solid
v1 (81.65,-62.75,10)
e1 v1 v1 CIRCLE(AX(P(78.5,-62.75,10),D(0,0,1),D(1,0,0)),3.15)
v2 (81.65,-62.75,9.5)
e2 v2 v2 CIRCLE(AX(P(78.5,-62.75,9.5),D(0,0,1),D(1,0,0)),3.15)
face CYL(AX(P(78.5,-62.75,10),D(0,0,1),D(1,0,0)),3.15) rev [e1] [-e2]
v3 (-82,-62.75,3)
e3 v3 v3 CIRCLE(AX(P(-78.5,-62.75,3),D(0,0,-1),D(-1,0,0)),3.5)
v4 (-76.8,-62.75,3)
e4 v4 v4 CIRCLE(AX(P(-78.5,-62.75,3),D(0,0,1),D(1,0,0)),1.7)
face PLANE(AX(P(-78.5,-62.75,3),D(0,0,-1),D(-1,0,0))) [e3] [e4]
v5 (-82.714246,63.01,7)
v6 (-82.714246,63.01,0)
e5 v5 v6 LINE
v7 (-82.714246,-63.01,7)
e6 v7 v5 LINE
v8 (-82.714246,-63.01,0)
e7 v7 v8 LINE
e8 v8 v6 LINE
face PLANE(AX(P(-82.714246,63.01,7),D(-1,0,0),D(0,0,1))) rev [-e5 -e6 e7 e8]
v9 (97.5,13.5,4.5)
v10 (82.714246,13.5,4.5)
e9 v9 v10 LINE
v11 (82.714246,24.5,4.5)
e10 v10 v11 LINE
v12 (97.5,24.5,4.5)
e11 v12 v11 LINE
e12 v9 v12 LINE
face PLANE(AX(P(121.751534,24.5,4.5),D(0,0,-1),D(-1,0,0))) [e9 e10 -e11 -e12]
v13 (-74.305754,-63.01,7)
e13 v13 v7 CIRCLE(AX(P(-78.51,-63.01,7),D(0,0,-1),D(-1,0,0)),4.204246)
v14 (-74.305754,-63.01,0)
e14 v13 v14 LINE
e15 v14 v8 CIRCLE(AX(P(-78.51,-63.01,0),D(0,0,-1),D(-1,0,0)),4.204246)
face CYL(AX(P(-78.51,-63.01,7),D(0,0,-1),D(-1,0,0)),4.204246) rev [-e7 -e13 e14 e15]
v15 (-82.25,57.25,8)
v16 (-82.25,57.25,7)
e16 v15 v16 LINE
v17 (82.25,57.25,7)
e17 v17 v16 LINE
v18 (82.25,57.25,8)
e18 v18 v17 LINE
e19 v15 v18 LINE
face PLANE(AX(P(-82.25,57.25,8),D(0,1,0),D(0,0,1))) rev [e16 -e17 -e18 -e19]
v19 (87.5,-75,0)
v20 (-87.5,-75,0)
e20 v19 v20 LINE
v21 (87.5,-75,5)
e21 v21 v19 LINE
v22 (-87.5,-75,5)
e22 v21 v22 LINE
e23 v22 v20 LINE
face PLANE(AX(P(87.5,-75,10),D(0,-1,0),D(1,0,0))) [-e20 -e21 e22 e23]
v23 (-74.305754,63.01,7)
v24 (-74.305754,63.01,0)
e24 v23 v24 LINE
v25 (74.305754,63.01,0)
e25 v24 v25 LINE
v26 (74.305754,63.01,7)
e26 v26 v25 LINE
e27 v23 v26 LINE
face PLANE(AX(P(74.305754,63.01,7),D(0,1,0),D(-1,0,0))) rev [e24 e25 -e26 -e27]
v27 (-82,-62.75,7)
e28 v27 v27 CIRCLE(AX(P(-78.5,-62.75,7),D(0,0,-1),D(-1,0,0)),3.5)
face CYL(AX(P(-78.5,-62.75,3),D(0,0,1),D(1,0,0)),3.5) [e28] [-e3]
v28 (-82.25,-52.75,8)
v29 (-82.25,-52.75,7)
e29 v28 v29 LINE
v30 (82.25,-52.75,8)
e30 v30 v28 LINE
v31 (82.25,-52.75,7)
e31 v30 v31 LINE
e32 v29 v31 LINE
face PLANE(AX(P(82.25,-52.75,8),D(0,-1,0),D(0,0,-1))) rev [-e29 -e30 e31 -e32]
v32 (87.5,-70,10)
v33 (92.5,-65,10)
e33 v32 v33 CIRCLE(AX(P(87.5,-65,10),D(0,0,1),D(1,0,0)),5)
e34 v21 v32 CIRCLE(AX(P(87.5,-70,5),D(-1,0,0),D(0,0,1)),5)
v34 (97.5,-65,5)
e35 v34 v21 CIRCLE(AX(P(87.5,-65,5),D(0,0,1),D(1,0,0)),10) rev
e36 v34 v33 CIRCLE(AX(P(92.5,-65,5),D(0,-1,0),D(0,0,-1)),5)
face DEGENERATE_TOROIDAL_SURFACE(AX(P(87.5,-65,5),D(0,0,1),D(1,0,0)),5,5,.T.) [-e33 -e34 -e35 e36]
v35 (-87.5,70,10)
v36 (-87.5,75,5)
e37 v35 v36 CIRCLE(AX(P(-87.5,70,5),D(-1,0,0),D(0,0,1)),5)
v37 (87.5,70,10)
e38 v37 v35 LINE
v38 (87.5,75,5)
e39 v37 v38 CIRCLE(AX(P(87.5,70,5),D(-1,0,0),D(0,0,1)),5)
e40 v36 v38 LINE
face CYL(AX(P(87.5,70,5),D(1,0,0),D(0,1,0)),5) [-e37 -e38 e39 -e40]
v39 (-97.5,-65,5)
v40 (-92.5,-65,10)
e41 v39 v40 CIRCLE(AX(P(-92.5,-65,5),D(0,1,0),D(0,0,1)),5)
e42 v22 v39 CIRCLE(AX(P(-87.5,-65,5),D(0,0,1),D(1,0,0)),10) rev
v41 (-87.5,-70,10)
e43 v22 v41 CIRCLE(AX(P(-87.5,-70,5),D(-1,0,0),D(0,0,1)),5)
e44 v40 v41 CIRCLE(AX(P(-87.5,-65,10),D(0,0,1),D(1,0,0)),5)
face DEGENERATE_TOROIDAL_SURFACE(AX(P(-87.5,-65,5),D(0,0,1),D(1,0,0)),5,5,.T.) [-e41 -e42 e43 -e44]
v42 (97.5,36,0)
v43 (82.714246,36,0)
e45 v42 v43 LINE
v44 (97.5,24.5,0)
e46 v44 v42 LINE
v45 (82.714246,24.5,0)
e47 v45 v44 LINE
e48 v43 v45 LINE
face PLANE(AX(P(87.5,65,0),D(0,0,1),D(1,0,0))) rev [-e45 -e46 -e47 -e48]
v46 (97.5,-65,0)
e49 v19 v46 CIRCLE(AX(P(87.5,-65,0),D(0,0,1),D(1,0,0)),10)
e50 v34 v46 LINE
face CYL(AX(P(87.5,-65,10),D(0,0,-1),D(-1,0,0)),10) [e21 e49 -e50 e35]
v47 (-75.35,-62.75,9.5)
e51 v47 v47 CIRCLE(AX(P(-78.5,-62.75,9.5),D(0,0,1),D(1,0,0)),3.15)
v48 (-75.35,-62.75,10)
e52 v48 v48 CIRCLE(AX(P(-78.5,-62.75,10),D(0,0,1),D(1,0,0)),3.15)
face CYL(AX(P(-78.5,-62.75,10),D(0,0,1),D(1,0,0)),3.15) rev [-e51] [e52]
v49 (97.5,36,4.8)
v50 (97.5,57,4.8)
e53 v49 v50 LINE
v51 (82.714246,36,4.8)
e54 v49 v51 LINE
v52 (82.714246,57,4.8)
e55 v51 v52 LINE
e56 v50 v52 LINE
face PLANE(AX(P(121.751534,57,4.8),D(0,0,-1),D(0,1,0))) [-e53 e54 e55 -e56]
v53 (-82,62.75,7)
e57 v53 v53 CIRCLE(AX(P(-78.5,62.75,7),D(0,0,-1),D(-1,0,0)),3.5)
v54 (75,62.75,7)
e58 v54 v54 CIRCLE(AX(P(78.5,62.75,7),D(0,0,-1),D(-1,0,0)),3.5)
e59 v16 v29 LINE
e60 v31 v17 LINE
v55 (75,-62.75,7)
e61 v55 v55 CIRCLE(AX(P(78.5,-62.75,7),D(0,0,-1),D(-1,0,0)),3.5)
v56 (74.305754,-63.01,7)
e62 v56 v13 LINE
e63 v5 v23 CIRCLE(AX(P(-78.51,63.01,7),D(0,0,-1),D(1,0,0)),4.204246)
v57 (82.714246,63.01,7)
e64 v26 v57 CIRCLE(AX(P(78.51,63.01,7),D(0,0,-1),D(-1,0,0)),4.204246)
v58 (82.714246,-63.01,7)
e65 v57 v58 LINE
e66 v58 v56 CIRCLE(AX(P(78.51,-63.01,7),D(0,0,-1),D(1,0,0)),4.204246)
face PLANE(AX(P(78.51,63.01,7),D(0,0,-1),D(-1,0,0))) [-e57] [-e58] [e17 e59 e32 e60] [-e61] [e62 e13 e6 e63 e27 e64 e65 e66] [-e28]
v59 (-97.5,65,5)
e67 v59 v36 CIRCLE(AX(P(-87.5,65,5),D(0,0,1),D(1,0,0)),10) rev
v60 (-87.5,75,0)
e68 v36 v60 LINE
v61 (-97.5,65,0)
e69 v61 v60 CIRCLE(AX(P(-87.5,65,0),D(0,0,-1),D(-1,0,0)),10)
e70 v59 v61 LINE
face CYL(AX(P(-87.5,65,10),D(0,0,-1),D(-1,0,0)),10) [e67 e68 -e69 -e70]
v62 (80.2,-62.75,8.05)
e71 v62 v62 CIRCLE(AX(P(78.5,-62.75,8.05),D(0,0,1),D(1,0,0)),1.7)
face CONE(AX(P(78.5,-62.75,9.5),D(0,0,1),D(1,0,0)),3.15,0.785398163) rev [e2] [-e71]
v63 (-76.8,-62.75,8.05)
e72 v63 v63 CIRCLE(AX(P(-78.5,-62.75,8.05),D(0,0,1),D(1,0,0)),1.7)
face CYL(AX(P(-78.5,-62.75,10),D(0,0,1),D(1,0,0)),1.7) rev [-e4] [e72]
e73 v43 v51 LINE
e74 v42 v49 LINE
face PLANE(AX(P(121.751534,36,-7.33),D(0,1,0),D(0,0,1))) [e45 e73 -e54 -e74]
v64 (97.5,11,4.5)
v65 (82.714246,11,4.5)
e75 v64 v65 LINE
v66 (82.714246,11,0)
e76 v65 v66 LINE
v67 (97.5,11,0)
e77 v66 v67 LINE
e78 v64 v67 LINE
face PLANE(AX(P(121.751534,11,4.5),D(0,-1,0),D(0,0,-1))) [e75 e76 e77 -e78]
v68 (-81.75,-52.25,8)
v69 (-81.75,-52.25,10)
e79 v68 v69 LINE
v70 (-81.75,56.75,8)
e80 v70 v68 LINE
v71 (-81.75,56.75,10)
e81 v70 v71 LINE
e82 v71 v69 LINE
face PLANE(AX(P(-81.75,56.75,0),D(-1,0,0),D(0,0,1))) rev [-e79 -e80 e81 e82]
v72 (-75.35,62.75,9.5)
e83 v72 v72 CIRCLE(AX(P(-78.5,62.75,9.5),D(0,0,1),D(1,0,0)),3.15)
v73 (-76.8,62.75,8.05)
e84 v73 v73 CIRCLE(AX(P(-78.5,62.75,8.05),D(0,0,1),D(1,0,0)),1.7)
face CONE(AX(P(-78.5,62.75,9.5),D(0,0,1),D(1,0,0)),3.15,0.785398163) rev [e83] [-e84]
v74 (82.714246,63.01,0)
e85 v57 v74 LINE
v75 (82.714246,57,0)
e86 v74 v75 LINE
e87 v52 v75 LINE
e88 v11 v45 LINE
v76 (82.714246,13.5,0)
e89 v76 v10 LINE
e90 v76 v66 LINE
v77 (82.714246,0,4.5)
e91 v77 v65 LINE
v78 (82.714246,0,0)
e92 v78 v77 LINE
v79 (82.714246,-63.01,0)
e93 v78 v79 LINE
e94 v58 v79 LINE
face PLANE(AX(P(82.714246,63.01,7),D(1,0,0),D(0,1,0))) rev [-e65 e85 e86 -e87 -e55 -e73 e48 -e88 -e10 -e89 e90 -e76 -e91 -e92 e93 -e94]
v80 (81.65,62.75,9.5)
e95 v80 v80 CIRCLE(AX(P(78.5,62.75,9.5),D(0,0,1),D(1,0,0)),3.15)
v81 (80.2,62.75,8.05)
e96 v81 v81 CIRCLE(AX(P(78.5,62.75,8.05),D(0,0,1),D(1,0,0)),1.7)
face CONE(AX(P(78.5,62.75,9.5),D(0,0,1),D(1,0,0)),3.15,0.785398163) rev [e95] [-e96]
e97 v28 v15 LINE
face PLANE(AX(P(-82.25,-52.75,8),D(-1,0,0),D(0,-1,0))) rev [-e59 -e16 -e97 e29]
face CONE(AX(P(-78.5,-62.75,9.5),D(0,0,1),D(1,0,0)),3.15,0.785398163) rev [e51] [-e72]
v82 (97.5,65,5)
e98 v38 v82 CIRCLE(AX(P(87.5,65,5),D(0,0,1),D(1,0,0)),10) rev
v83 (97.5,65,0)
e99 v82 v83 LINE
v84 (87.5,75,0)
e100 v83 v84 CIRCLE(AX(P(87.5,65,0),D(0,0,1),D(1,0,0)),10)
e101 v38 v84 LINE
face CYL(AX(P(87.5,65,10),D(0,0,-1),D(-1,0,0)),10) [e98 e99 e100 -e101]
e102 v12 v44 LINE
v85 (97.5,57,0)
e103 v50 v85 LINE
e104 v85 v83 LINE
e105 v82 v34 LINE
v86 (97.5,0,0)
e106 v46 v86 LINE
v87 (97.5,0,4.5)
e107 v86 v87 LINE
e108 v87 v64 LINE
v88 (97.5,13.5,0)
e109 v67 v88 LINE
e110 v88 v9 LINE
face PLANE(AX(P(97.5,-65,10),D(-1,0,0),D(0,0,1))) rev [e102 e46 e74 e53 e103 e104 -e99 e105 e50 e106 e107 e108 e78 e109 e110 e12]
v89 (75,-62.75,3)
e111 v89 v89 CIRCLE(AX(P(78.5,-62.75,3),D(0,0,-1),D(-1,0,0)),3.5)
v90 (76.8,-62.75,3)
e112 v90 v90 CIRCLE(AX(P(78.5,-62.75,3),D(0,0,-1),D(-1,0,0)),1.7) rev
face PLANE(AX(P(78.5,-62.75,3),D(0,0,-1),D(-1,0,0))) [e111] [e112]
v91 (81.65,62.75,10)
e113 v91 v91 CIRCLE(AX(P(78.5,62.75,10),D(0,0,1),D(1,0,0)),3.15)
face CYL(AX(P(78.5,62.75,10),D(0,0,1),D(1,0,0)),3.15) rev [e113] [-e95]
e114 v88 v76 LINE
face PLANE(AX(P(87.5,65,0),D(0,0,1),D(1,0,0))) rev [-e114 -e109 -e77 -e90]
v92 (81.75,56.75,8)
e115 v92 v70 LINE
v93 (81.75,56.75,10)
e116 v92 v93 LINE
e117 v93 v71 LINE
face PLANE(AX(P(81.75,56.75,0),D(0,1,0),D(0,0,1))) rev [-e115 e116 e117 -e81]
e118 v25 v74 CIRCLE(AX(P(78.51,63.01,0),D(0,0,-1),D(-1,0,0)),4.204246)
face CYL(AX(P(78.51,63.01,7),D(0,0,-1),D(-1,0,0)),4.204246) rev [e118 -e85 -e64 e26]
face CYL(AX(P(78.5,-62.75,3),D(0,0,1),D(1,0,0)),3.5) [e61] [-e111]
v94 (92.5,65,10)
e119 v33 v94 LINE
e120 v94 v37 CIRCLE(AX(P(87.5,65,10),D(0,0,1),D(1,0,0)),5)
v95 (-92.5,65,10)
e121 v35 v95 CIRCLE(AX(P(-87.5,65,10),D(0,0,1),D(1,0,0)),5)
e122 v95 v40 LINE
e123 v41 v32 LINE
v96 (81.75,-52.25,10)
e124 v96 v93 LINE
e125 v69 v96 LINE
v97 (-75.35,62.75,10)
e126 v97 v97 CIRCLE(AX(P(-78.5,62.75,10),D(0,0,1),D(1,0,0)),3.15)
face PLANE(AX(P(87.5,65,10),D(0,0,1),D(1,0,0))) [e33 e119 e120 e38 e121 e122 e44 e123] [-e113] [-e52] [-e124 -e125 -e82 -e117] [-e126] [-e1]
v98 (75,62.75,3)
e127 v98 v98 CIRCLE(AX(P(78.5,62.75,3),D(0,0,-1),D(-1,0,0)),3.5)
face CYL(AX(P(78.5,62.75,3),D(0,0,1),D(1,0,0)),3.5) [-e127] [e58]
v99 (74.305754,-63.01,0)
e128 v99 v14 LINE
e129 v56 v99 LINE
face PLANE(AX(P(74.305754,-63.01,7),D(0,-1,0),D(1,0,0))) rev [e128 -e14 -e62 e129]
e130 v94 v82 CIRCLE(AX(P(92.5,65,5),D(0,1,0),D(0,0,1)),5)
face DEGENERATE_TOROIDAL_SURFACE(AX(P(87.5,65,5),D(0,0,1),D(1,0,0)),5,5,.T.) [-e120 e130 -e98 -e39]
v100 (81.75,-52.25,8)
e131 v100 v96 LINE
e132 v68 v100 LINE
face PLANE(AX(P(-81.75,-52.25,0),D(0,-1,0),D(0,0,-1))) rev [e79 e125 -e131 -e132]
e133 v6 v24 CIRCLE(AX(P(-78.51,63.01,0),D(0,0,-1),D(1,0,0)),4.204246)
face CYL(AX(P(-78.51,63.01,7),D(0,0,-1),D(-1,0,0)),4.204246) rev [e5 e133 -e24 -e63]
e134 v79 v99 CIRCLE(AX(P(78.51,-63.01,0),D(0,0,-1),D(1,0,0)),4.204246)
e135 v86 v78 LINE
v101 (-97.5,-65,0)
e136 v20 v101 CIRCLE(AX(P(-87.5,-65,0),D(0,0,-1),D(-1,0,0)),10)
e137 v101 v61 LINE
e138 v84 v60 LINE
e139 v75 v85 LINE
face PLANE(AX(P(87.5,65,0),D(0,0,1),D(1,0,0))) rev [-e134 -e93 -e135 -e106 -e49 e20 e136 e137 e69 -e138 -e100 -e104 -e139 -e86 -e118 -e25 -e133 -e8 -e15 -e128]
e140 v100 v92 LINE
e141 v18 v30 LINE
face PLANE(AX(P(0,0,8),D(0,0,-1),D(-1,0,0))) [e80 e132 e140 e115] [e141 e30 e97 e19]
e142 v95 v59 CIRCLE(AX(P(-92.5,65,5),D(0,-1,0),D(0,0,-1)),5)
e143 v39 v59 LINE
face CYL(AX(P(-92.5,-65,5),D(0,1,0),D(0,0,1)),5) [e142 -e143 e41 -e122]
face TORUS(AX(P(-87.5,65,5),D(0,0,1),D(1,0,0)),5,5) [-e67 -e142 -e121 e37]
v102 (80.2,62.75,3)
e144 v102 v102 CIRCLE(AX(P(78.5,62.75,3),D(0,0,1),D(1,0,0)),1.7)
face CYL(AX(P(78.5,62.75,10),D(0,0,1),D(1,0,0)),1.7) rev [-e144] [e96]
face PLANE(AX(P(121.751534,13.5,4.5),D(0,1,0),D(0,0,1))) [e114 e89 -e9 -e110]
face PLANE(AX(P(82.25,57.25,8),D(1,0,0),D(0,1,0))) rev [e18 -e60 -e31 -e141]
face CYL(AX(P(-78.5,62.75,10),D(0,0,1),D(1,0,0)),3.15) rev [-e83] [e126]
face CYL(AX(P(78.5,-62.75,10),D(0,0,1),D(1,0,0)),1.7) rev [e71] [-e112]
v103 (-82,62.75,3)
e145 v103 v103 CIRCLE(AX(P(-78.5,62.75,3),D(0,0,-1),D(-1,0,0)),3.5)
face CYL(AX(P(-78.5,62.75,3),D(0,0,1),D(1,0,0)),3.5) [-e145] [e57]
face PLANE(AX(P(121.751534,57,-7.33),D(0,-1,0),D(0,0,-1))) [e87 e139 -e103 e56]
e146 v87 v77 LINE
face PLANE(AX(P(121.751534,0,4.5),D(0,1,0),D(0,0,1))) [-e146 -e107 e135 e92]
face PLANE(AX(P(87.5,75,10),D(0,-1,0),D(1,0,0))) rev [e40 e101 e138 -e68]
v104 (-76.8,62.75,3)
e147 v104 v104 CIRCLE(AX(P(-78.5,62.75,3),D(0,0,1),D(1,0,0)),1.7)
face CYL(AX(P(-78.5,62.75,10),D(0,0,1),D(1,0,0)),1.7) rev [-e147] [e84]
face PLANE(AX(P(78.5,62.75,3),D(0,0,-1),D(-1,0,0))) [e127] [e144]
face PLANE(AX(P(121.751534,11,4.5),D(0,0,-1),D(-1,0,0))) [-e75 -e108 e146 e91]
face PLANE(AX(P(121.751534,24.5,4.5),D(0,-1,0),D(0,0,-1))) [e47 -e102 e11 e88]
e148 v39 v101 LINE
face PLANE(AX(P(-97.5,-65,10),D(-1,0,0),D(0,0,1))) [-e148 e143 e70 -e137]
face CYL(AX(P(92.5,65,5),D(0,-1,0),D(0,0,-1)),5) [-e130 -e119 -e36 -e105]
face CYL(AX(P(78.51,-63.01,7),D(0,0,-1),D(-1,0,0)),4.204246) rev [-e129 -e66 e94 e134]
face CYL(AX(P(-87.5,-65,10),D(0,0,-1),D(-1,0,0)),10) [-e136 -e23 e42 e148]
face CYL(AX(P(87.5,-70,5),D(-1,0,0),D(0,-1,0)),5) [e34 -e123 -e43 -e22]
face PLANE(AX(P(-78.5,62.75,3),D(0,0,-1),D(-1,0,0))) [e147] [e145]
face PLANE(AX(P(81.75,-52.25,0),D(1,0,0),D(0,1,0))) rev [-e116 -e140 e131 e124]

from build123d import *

# Parameters (mm, degrees)
BOSS_EXTRU_1_DEPTH      = 10
ESQUISSE2_W             = 163.5
ESQUISSE2_H             = 109
ENL_V_MAT_EXTRU_1_DEPTH = 10
ESQUISSE3_W             = 164.5
ESQUISSE3_H             = 110
ENL_V_MAT_EXTRU_2_DEPTH = 8
ENL_V_MAT_EXTRU_3_DEPTH = 7
ESQUISSE5_R             = 3.5
BOSS_EXTRU_2_DEPTH      = 4
CONG_1_R                = 5
ESQUISSE6_W             = 12.13
ESQUISSE6_H             = 21
ESQUISSE6_W_2           = 8
ESQUISSE6_H_2           = 11
ENL_V_MAT_EXTRU_4_DEPTH = 97.5


# Read off the part's stored shape, not the designer's step: Fraisage pour vis à tête fraisée M31
with BuildPart() as part:
    # Esquisse1 → Boss.-Extru.1 (new body)
    with BuildSketch(Plane.XY):
        with BuildLine():
            Line((87.5, -75), (-87.5, -75))
            ThreePointArc((-87.5, -75), (-94.571067812, -72.071067812), (-97.5, -65))
            Line((-97.5, -65), (-97.5, 65))
            ThreePointArc((-97.5, 65), (-94.571067812, 72.071067812), (-87.5, 75))
            Line((-87.5, 75), (87.5, 75))
            ThreePointArc((87.5, 75), (94.571067812, 72.071067812), (97.5, 65))
            Line((97.5, 65), (97.5, -65))
            ThreePointArc((97.5, -65), (94.571067812, -72.071067812), (87.5, -75))
        make_face()
    extrude(amount=BOSS_EXTRU_1_DEPTH)

    # Esquisse2 → Enlèv. mat.-Extru.1 (cut)
    with BuildSketch(Plane.XY.offset(10)):
        with Locations((0, 2.25)):
            Rectangle(ESQUISSE2_W, ESQUISSE2_H)
    extrude(amount=-ENL_V_MAT_EXTRU_1_DEPTH, mode=Mode.SUBTRACT)

    # Esquisse3 → Enlèv. mat.-Extru.2 (cut)
    with BuildSketch(Plane(origin=(0, 0, 0), x_dir=(-1, 0, 0), z_dir=(0, 0, -1))):
        with Locations((0, 2.25)):
            Rectangle(ESQUISSE3_W, ESQUISSE3_H)
    extrude(amount=-ENL_V_MAT_EXTRU_2_DEPTH, mode=Mode.SUBTRACT)

    # Esquisse4 → Enlèv. mat.-Extru.3 (cut)
    with BuildSketch(Plane(origin=(0, 0, 0), x_dir=(-1, 0, 0), z_dir=(0, 0, -1))):
        with BuildLine():
            Line((-74.305753882, -63.01), (74.305753882, -63.01))
            ThreePointArc((74.305753882, -63.01), (78.51, -67.214246118), (82.714246118, -63.01))
            Line((82.714246118, -63.01), (82.714246118, 63.01))
            ThreePointArc((82.714246118, 63.01), (78.51, 67.214246118), (74.305753882, 63.01))
            Line((74.305753882, 63.01), (-74.305753882, 63.01))
            ThreePointArc((-74.305753882, 63.01), (-78.51, 67.214246118), (-82.714246118, 63.01))
            Line((-82.714246118, 63.01), (-82.714246118, -63.01))
            ThreePointArc((-82.714246118, -63.01), (-78.51, -67.214246118), (-74.305753882, -63.01))
        make_face()
    extrude(amount=-ENL_V_MAT_EXTRU_3_DEPTH, mode=Mode.SUBTRACT)

    # Esquisse5 → Boss.-Extru.2 (add)
    with BuildSketch(Plane(origin=(0, 0, 7), x_dir=(-1, 0, 0), z_dir=(0, 0, -1))):
        with Locations((-78.5, -62.75)):
            Circle(ESQUISSE5_R)
        with Locations((78.5, -62.75)):
            Circle(ESQUISSE5_R)
        with Locations((78.5, 62.75)):
            Circle(ESQUISSE5_R)
        with Locations((-78.5, 62.75)):
            Circle(ESQUISSE5_R)
    extrude(amount=BOSS_EXTRU_2_DEPTH)

    # Congé1
    cong_1_edges = [part.edges().sort_by_distance(p)[0] for p in [
        (-94.571067812, 72.071067812, 10),
        (-97.5, 0, 10),
        (-94.571067812, -72.071067812, 10),
        (0, -75, 10),
        (94.571067812, -72.071067812, 10),
        (97.5, 0, 10),
        (94.571067812, 72.071067812, 10),
        (0, 75, 10),
    ]]
    fillet(cong_1_edges, radius=CONG_1_R)

    # Esquisse6 → Enlèv. mat.-Extru.4 (cut)
    with BuildSketch(Plane(origin=(0, 0, 0), x_dir=(0, 0, -1), z_dir=(1, 0, 0))):
        with Locations((1.265, 46.5)):
            Rectangle(ESQUISSE6_W, ESQUISSE6_H)
        with Locations((-0.5, 19)):
            Rectangle(ESQUISSE6_W_2, ESQUISSE6_H_2)
        with Locations((-0.5, 5.5)):
            Rectangle(ESQUISSE6_W_2, ESQUISSE6_H_2)
    extrude(amount=ENL_V_MAT_EXTRU_4_DEPTH, mode=Mode.SUBTRACT)

    # Fraisage pour vis à tête fraisée M31 out → Fraisage pour vis à tête fraisée M31 (revolve, cut)
    with BuildSketch(Plane(origin=(-78.5, -62.75, 0), x_dir=(1, 0, 0), z_dir=(0, -1, 0))):
        Polygon((0, 3), (1.7, 3), (1.7, 8.05), (3.15, 9.5), (3.15, 10), (0, 10), align=None)
    revolve(axis=Axis((-78.5, -62.75, 0), (0, 0, 1)), mode=Mode.SUBTRACT)

    # Fraisage pour vis _ t_te frais_e M31 2 o → Fraisage pour vis _ t_te frais_e M31 2 (revolve, cut)
    with BuildSketch(Plane(origin=(78.5, -62.75, 0), x_dir=(1, 0, 0), z_dir=(0, -1, 0))):
        Polygon((0, 3), (1.7, 3), (1.7, 8.05), (3.15, 9.5), (3.15, 10), (0, 10), align=None)
    revolve(axis=Axis((78.5, -62.75, 0), (0, 0, 1)), mode=Mode.SUBTRACT)

    # Fraisage pour vis _ t_te frais_e M31 3 o → Fraisage pour vis _ t_te frais_e M31 3 (revolve, cut)
    with BuildSketch(Plane(origin=(78.5, 62.75, 0), x_dir=(1, 0, 0), z_dir=(0, -1, 0))):
        Polygon((0, 3), (1.7, 3), (1.7, 8.05), (3.15, 9.5), (3.15, 10), (0, 10), align=None)
    revolve(axis=Axis((78.5, 62.75, 0), (0, 0, 1)), mode=Mode.SUBTRACT)

    # Fraisage pour vis _ t_te frais_e M31 4 o → Fraisage pour vis _ t_te frais_e M31 4 (revolve, cut)
    with BuildSketch(Plane(origin=(-78.5, 62.75, 0), x_dir=(1, 0, 0), z_dir=(0, -1, 0))):
        Polygon((0, 3), (1.7, 3), (1.7, 8.05), (3.15, 9.5), (3.15, 10), (0, 10), align=None)
    revolve(axis=Axis((-78.5, 62.75, 0), (0, 0, 1)), mode=Mode.SUBTRACT)


solid = part.part
